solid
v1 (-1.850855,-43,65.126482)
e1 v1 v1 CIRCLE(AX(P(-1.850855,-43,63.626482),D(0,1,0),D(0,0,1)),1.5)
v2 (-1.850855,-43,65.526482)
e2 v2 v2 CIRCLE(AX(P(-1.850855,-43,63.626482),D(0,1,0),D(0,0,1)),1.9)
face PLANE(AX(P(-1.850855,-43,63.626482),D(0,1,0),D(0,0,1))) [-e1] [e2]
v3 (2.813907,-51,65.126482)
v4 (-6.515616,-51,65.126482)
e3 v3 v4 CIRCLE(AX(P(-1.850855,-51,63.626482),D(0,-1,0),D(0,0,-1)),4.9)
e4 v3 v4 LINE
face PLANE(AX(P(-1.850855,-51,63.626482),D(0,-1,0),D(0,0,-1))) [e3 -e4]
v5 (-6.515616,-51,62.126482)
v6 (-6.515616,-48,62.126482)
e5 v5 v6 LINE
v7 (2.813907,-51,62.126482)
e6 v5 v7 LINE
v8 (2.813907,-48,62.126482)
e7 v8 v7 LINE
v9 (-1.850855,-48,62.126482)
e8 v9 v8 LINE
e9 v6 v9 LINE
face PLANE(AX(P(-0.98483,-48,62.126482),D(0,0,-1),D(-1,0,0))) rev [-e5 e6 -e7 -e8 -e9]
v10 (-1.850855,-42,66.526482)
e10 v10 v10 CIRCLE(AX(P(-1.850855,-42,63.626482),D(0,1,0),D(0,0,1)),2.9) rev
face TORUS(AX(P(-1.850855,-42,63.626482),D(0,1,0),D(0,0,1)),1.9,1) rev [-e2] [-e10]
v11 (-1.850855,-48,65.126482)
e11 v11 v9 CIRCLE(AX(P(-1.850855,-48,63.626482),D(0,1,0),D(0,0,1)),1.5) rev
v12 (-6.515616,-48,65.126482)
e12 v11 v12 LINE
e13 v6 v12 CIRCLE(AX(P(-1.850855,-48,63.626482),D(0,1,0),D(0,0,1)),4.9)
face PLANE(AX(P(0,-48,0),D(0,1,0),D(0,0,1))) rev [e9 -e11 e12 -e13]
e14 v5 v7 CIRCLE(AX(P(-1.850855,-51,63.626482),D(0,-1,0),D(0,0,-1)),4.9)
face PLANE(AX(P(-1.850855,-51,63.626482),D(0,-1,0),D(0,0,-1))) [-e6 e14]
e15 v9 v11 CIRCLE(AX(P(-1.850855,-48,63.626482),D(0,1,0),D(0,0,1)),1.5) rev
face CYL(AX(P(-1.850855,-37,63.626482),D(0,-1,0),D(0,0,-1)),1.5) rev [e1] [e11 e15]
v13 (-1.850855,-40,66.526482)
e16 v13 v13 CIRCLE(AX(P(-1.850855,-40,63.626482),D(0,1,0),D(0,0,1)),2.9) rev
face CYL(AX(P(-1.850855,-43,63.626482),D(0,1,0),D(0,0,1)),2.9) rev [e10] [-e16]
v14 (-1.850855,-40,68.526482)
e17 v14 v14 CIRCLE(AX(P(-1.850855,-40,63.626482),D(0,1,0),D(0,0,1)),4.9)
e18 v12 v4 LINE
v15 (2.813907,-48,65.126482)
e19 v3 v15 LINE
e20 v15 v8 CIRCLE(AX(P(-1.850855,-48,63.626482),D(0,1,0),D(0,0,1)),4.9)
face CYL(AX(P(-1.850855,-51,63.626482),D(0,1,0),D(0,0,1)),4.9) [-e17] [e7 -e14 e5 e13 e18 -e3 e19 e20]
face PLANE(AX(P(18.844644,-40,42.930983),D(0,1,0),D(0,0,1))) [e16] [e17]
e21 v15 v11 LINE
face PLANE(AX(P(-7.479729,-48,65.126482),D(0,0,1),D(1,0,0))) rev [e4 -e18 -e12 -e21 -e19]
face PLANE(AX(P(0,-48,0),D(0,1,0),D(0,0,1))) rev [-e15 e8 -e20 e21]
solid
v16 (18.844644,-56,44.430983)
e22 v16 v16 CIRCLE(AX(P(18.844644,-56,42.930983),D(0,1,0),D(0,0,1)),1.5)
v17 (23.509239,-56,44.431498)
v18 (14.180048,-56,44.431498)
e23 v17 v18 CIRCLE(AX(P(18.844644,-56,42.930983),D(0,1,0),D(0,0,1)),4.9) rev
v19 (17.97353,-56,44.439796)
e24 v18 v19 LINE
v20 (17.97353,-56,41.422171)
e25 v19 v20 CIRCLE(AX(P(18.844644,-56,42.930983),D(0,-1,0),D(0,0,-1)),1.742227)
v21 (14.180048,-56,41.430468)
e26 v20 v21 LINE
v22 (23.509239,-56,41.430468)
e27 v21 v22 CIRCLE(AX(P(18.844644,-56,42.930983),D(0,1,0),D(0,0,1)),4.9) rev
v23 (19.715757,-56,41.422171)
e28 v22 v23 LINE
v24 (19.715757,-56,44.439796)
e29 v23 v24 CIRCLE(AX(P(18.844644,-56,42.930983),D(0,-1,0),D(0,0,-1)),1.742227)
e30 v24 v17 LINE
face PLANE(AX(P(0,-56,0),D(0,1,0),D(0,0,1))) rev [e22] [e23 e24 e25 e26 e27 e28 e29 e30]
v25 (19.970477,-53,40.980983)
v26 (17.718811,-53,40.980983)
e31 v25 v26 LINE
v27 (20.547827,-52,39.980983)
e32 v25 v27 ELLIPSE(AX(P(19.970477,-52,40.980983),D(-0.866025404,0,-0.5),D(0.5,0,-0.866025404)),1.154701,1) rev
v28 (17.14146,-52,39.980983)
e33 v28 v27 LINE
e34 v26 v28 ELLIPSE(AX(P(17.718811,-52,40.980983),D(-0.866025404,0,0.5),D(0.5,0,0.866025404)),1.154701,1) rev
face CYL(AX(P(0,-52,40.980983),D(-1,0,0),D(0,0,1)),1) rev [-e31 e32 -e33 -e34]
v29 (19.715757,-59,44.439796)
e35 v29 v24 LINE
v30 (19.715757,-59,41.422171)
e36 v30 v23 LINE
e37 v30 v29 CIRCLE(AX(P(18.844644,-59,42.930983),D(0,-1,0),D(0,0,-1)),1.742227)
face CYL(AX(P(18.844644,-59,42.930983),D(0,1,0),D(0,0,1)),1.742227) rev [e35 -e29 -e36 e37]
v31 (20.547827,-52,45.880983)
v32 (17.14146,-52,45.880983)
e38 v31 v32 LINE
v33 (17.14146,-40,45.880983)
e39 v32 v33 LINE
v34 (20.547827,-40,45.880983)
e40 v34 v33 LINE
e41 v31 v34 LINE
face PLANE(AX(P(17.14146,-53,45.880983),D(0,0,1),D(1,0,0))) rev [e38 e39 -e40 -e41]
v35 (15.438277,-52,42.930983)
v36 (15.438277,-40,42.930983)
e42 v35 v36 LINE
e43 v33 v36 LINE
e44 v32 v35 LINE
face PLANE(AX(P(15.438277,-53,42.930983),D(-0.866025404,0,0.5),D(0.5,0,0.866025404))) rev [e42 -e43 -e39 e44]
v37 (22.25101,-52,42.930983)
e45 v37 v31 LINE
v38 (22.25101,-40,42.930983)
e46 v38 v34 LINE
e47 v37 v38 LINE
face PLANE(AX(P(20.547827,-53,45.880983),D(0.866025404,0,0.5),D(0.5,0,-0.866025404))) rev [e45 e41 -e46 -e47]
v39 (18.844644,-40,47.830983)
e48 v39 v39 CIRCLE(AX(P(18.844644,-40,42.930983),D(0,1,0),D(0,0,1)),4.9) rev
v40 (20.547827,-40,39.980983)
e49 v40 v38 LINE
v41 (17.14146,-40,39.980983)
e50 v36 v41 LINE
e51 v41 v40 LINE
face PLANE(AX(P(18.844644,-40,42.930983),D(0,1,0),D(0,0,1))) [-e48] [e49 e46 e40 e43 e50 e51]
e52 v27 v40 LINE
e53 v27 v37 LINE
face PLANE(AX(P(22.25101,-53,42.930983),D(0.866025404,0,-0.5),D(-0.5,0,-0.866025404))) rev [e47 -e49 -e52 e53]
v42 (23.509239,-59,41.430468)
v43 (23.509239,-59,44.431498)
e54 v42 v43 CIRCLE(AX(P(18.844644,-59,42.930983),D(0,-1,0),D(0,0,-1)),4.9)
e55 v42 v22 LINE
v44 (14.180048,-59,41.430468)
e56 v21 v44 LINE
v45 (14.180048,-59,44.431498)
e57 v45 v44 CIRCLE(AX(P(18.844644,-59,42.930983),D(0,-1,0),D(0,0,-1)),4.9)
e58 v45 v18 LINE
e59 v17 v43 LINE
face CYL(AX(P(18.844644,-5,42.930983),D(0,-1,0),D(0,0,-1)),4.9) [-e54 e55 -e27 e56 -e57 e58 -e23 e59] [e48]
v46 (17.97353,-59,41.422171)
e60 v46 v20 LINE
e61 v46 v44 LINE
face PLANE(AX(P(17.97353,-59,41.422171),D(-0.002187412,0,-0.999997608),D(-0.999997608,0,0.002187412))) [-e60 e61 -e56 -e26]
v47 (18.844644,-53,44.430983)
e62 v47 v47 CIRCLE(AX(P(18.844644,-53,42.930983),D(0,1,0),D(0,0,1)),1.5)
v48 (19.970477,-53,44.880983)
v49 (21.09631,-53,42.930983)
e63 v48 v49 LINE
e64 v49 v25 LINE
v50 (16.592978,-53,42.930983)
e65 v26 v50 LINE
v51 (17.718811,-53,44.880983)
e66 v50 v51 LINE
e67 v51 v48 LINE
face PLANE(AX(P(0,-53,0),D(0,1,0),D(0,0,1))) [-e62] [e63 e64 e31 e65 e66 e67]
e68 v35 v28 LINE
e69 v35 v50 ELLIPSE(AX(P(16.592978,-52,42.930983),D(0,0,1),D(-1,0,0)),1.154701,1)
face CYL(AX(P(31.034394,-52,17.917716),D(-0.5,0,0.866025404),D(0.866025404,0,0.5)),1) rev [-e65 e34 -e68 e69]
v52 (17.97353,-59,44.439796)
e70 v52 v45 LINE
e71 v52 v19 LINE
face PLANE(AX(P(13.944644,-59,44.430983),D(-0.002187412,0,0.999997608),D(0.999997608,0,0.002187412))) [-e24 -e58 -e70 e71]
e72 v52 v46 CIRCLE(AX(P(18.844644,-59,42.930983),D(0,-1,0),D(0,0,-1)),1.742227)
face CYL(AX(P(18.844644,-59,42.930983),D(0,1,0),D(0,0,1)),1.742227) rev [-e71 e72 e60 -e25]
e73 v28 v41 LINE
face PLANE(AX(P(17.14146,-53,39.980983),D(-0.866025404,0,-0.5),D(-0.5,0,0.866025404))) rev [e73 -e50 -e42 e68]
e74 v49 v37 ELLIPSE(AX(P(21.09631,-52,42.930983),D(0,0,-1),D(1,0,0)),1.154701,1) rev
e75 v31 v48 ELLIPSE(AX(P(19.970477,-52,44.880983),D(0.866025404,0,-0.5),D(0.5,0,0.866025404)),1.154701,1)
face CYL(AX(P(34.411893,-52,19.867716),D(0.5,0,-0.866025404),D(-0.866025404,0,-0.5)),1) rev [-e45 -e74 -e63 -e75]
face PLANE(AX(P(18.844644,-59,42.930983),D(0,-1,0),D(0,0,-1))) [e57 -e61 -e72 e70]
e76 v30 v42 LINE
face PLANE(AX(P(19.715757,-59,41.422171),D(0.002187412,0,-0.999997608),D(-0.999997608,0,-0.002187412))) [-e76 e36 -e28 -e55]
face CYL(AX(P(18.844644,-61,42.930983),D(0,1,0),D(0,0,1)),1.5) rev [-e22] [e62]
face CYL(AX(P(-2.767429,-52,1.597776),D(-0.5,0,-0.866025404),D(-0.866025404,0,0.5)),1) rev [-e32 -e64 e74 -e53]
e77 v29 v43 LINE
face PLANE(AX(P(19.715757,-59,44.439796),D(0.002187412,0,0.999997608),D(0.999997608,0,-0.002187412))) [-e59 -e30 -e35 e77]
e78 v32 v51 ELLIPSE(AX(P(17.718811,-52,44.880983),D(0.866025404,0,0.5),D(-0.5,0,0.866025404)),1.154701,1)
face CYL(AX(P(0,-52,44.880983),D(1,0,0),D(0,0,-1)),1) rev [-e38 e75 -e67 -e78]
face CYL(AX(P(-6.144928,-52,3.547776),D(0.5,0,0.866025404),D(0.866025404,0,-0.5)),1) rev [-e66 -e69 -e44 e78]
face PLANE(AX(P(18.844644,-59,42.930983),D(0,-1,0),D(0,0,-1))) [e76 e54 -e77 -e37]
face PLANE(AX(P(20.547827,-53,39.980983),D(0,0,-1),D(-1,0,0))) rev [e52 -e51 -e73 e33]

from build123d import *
from build123d.topology import SkipClean

# Parameters (mm, degrees)
EXTRUDE_1_DEPTH          = 3
SKETCH_2_R               = 5.35
EXTRUDE_2_DEPTH          = 23
CUT_EXTRUDE_1_DEPTH      = 3
SKETCH_4_R               = 5
EXTRUDE_3_DEPTH          = 100
EXTRUDE_START            = 3
SKETCH_5_R               = 5
EXTRUDE_4_DEPTH          = 3
SKETCH_6_R               = 5.35
EXTRUDE_5_DEPTH          = 5
SKETCH_7_R               = 5.35
EXTRUDE_6_DEPTH          = 5
SKETCH_8_W               = 75
SKETCH_8_H               = 10.7
EXTRUDE_7_DEPTH          = 3
EXTRUDE_8_DEPTH          = 3
CUT_EXTRUDE_2_DEPTH      = 3
SKETCH_12_R              = 6
EXTRUDE_10_DEPTH         = 13
SKETCH_13_R              = 3
CUT_EXTRUDE_3_DEPTH      = 23
SKETCH_14_R              = 3.125
CUT_EXTRUDE_5_DEPTH      = 100
SKETCH_15_R              = 6
SKETCH_15_R_2            = 5.35
EXTRUDE_11_DEPTH         = 5
SKETCH_16_R              = 6
SKETCH_16_R_2            = 3
EXTRUDE_12_DEPTH         = 5
SKETCH_17_R              = 5.35
SKETCH_17_R_2            = 3
EXTRUDE_13_DEPTH         = 5
SKETCH_18_R              = 5.35
SKETCH_18_R_2            = 3
EXTRUDE_14_DEPTH         = 5
SKETCH_20_R              = 6
SKETCH_20_R_2            = 5.35
EXTRUDE_15_DEPTH         = 5
SKETCH_21_R              = 6
SKETCH_21_R_2            = 5.35
EXTRUDE_16_DEPTH         = 5
SKETCH_22_R              = 5.35
SKETCH_22_R_2            = 3
EXTRUDE_17_DEPTH         = 5
SKETCH_23_R              = 5.35
SKETCH_23_R_2            = 3
EXTRUDE_18_DEPTH         = 5
SKETCH_25_R              = 7.5
EXTRUDE_20_DEPTH         = 3
EXTRUDE_21_DEPTH         = 3
EXTRUDE_23_DEPTH         = 3
SKETCH_30_R              = 7.5
EXTRUDE_24_DEPTH         = 3
FILLET_1_R               = 3
EXTRUDE_29_DEPTH         = 5
EXTRUDE_31_DEPTH         = 2
SKETCH_50_R              = 5.998205811
EXTRUDE_32_DEPTH         = 103
CUT_EXTRUDE_START        = -95
SKETCH_52_R              = 5.998205811
SKETCH_52_R_2            = 4.9
CUT_EXTRUDE_7_DEPTH      = 95
CUT_EXTRUDE_START_2      = -44
SKETCH_53_R              = 4.9
CUT_EXTRUDE_8_DEPTH      = 44
SKETCH_54_R              = 1.5
EXTRUDE_33_DEPTH         = 5
CUT_EXTRUDE_9_DEPTH      = 56
CUT_EXTRUDE_START_3      = -6
SKETCH_56_R              = 1.5
CUT_EXTRUDE_10_DEPTH     = 6
SKETCH_57_R              = 15
EXTRUDE_34_DEPTH         = 3
SKETCH_58_R              = 4.9
EXTRUDE_35_DEPTH         = 51
CUT_EXTRUDE_11_DEPTH     = 5
SKETCH_60_R              = 2.75
CUT_EXTRUDE_12_DEPTH     = 46
SKETCH_61_R              = 1.5
CUT_EXTRUDE_13_DEPTH     = 9
CUT_EXTRUDE_14_DEPTH     = 1.65
SKETCH_63_R              = 1
CUT_EXTRUDE_15_DEPTH     = 1.5
PATTERN_CIRCULAR_1_COUNT = 8
SKETCH_64_R              = 3.175426481
CUT_EXTRUDE_17_DEPTH     = 5
CUT_EXTRUDE_18_DEPTH     = 56
FILLET_2_R               = 1
EXTRUDE_36_DEPTH         = 5
SKETCH_67_R              = 1.5
CUT_EXTRUDE_19_DEPTH     = 5
FILLET_3_R               = 1
SKETCH_69_R              = 4.9
EXTRUDE_37_DEPTH         = 3
CUT_EXTRUDE_20_DEPTH     = 3
CUT_EXTRUDE_21_DEPTH     = 3
SKETCH_71_R              = 2.9
CUT_EXTRUDE_22_DEPTH     = 46
FILLET_4_R               = 1
SKETCH_72_R              = 1.742227019
CUT_EXTRUDE_23_DEPTH     = 3
SKETCH_73_R              = 80.568132645
CUT_EXTRUDE_24_DEPTH     = 40
SKETCH_74_R              = 81.791796687
CUT_EXTRUDE_25_DEPTH     = 40


with BuildPart() as part:
    # 草图1 → 凸台-拉伸1 (new body)
    with BuildSketch(Plane(origin=(0, 0, 0), x_dir=(1, 0, 0), z_dir=(0, 1, 0))):
        Polygon((-18.65535641, 0), (18.84464359, -42.930983399), (56.34464359, 0), align=None)
    extrude(amount=EXTRUDE_1_DEPTH)

    # 草图2 → 凸台-拉伸2 (add)
    with BuildSketch(Plane(origin=(0, 3, 0), x_dir=(1, 0, 0), z_dir=(0, 1, 0))):
        with Locations(Location((56.34464359, 0, 0), (0, 0, 270))):
            Circle(SKETCH_2_R)
        with Locations(Location((-18.65535641, 0, 0), (0, 0, 270))):
            Circle(SKETCH_2_R)
    extrude(amount=-EXTRUDE_2_DEPTH)

    # 草图3 → 切除-拉伸1 (cut)
    with BuildSketch(Plane.XZ):
        Polygon((8.632668758, 17.559374543), (1.15609776, 9), (33.75905687, 9), (36.53318942, 9), (29.056618422, 17.559374543), (18.84464359, 29.25031113), align=None)
    extrude(amount=-CUT_EXTRUDE_1_DEPTH, mode=Mode.SUBTRACT)

    # 草图4 → 凸台-拉伸3 (add)
    with BuildSketch(Plane.XZ):
        with Locations(Location((18.84464359, 42.930983399, 0), (0, 0, 228.862949093))):
            Circle(SKETCH_4_R)
    extrude(amount=EXTRUDE_3_DEPTH)

    # 草图5 → 凸台-拉伸4 (add)
    with BuildSketch(Plane(origin=(0, 0, 0), x_dir=(1, 0, 0), z_dir=(0, 1, 0)).offset(EXTRUDE_START)):
        with Locations(Location((18.84464359, -42.930983399, 0), (0, 0, 131.137050907))):
            Circle(SKETCH_5_R)
    extrude(amount=-EXTRUDE_4_DEPTH)

    # 草图6 → 凸台-拉伸5 (add)
    with SkipClean():  # the faces are left unmerged after this step: merging them gives an invalid solid
        with BuildSketch(Plane.XZ.offset(20)):
            with Locations(Location((56.34464359, 0, 0), (0, 0, 131.137050907))):
                Circle(SKETCH_6_R)
        extrude(amount=EXTRUDE_5_DEPTH)
    add(part.part.scale(1), mode=Mode.REPLACE)  # the faces are merged on a copy

    # 草图7 → 凸台-拉伸6 (add)
    with BuildSketch(Plane.XZ.offset(20)):
        with Locations(Location((-18.65535641, 0, 0), (0, 0, 48.862949093))):
            Circle(SKETCH_7_R)
    extrude(amount=EXTRUDE_6_DEPTH)

    # 草图8 → 凸台-拉伸7 (add)
    with SkipClean():  # the faces are left unmerged after this step: merging them gives an invalid solid
        with BuildSketch(Plane(origin=(0, 3, 0), x_dir=(1, 0, 0), z_dir=(0, 1, 0))):
            with Locations((18.84464359, 0)):
                Rectangle(SKETCH_8_W, SKETCH_8_H)
        extrude(amount=-EXTRUDE_7_DEPTH)

    # 草图9 → 凸台-拉伸8 (add)
    with SkipClean():  # the faces are left unmerged after this step: merging them gives an invalid solid
        with BuildSketch(Plane(origin=(0, 3, 0), x_dir=(1, 0, 0), z_dir=(0, 1, 0))):
            Polygon((61.69464359, 0), (18.84464359, -47.930983399), (-24.00535641, 0), align=None)
        extrude(amount=-EXTRUDE_8_DEPTH)

    # 草图10 → 切除-拉伸2 (cut)
    with SkipClean():  # the faces are left unmerged after this step: merging them gives an invalid solid
        with BuildSketch(Plane.XZ):
            Polygon((18.84464359, 37.930983399), (-13.313716495, 0.298969924), (50.99464359, 0), align=None)
        extrude(amount=-CUT_EXTRUDE_2_DEPTH, mode=Mode.SUBTRACT)

    # 草图12 → 凸台-拉伸10 (add)
    with SkipClean():  # the faces are left unmerged after this step: merging them gives an invalid solid
        with BuildSketch(Plane(origin=(0, 3, 0), x_dir=(1, 0, 0), z_dir=(0, 1, 0))):
            with Locations(Location((-18.65535641, 0, 0), (0, 0, 270))):
                Circle(SKETCH_12_R)
            with Locations(Location((56.34464359, 0, 0), (0, 0, 270))):
                Circle(SKETCH_12_R)
        extrude(amount=-EXTRUDE_10_DEPTH)

    # 草图13 → 切除-拉伸3 (cut)
    with SkipClean():  # the faces are left unmerged after this step: merging them gives an invalid solid
        with BuildSketch(Plane.XZ.offset(25)):
            with Locations(Location((-18.65535641, 0, 0), (0, 0, 270))):
                Circle(SKETCH_13_R)
            with Locations(Location((56.34464359, 0, 0), (0, 0, 270))):
                Circle(SKETCH_13_R)
        extrude(amount=-CUT_EXTRUDE_3_DEPTH, mode=Mode.SUBTRACT)

    # 草图14 → 切除-拉伸5 (cut)
    with SkipClean():  # the faces are left unmerged after this step: merging them gives an invalid solid
        with BuildSketch(Plane.XZ.offset(100)):
            with Locations(Location((18.84464359, 42.930983399, 0), (0, 0, 270))):
                Circle(SKETCH_14_R)
        extrude(amount=-CUT_EXTRUDE_5_DEPTH, mode=Mode.SUBTRACT)

    # 草图15 → 凸台-拉伸11 (add)
    with SkipClean():  # the faces are left unmerged after this step: merging them gives an invalid solid
        with BuildSketch(Plane.XZ.offset(10)):
            with Locations(Location((56.34464359, 0, 0), (0, 0, 90.133194259))):
                Circle(SKETCH_15_R)
            with Locations(Location((56.34464359, 0, 0), (0, 0, 270))):
                Circle(SKETCH_15_R_2, mode=Mode.SUBTRACT)
        extrude(amount=EXTRUDE_11_DEPTH)

    # 草图16 → 凸台-拉伸12 (add)
    with SkipClean():  # the faces are left unmerged after this step: merging them gives an invalid solid
        with BuildSketch(Plane.XZ.offset(10)):
            with Locations(Location((-18.65535641, 0, 0), (0, 0, 89.866805741))):
                Circle(SKETCH_16_R)
            with Locations(Location((-18.65535641, 0, 0), (0, 0, 270))):
                Circle(SKETCH_16_R_2, mode=Mode.SUBTRACT)
        extrude(amount=EXTRUDE_12_DEPTH)

    # 草图17 → 凸台-拉伸13 (add)
    with SkipClean():  # the faces are left unmerged after this step: merging them gives an invalid solid
        with BuildSketch(Plane.XZ.offset(25)):
            with Locations(Location((-18.65535641, 0, 0), (0, 0, 270))):
                Circle(SKETCH_17_R)
            with Locations(Location((-18.65535641, 0, 0), (0, 0, 270))):
                Circle(SKETCH_17_R_2, mode=Mode.SUBTRACT)
        extrude(amount=EXTRUDE_13_DEPTH)

    # 草图18 → 凸台-拉伸14 (add)
    with SkipClean():  # the faces are left unmerged after this step: merging them gives an invalid solid
        with BuildSketch(Plane.XZ.offset(25)):
            with Locations(Location((56.34464359, 0, 0), (0, 0, 270))):
                Circle(SKETCH_18_R)
            with Locations(Location((56.34464359, 0, 0), (0, 0, 270))):
                Circle(SKETCH_18_R_2, mode=Mode.SUBTRACT)
        extrude(amount=EXTRUDE_14_DEPTH)

    # 草图20 → 凸台-拉伸15 (add)
    with SkipClean():  # the faces are left unmerged after this step: merging them gives an invalid solid
        with BuildSketch(Plane.XZ.offset(15)):
            with Locations(Location((-18.65535641, 0, 0), (0, 0, 89.866805741))):
                Circle(SKETCH_20_R)
            with Locations(Location((-18.65535641, 0, 0), (0, 0, 270))):
                Circle(SKETCH_20_R_2, mode=Mode.SUBTRACT)
        extrude(amount=EXTRUDE_15_DEPTH)

    # 草图21 → 凸台-拉伸16 (add)
    with SkipClean():  # the faces are left unmerged after this step: merging them gives an invalid solid
        with BuildSketch(Plane.XZ.offset(15)):
            with Locations(Location((56.34464359, 0, 0), (0, 0, 90.133194259))):
                Circle(SKETCH_21_R)
            with Locations(Location((56.34464359, 0, 0), (0, 0, 270))):
                Circle(SKETCH_21_R_2, mode=Mode.SUBTRACT)
        extrude(amount=EXTRUDE_16_DEPTH)

    # 草图22 → 凸台-拉伸17 (add)
    with SkipClean():  # the faces are left unmerged after this step: merging them gives an invalid solid
        with BuildSketch(Plane.XZ.offset(30)):
            with Locations(Location((-18.65535641, 0, 0), (0, 0, 270))):
                Circle(SKETCH_22_R)
            with Locations(Location((-18.65535641, 0, 0), (0, 0, 270))):
                Circle(SKETCH_22_R_2, mode=Mode.SUBTRACT)
        extrude(amount=EXTRUDE_17_DEPTH)

    # 草图23 → 凸台-拉伸18 (add)
    with SkipClean():  # the faces are left unmerged after this step: merging them gives an invalid solid
        with BuildSketch(Plane.XZ.offset(30)):
            with Locations(Location((56.34464359, 0, 0), (0, 0, 270))):
                Circle(SKETCH_23_R)
            with Locations(Location((56.34464359, 0, 0), (0, 0, 270))):
                Circle(SKETCH_23_R_2, mode=Mode.SUBTRACT)
        extrude(amount=EXTRUDE_18_DEPTH)

    # 草图25 → 凸台-拉伸20 (add)
    with SkipClean():  # the faces are left unmerged after this step: merging them gives an invalid solid
        with BuildSketch(Plane(origin=(0, 3, 0), x_dir=(1, 0, 0), z_dir=(0, 1, 0))):
            with Locations((18.84464359, -42.930983399)):
                Circle(SKETCH_25_R)
        extrude(amount=-EXTRUDE_20_DEPTH)

    # 草图28 → 凸台-拉伸21 (add)
    with SkipClean():  # the faces are left unmerged after this step: merging them gives an invalid solid
        with BuildSketch(Plane(origin=(0, 3, 0), x_dir=(1, 0, 0), z_dir=(0, 1, 0))):
            Polygon((-3.379636645, -23.071435978), (2.093554995, -18.328702995), (68.652557408, -96.216669577), (66.868599364, -97.910067347), (64.321605904, -100.026810209), align=None)
        extrude(amount=-EXTRUDE_21_DEPTH)

    # 草图29 → 凸台-拉伸23 (add)
    with SkipClean():  # the faces are left unmerged after this step: merging them gives an invalid solid
        with BuildSketch(Plane(origin=(0, 3, 0), x_dir=(1, 0, 0), z_dir=(0, 1, 0))):
            Polygon((56.34464359, 0), (53.74105837, -88), (59.74105837, -88), (62.34464359, 0), align=None)
        extrude(amount=-EXTRUDE_23_DEPTH)

    # 草图30 → 凸台-拉伸24 (add)
    with SkipClean():  # the faces are left unmerged after this step: merging them gives an invalid solid
        with BuildSketch(Plane(origin=(0, 3, 0), x_dir=(1, 0, 0), z_dir=(0, 1, 0))):
            with Locations((62.6531538, -93.694621783)):
                Circle(SKETCH_30_R)
        extrude(amount=-EXTRUDE_24_DEPTH)

    # 圆角1
    # the kernel refuses this fillet: 3 mm, written as the material it adds along each edge
    with BuildSketch(Plane(origin=(60.387632696, 0, 86.544977448), x_dir=(-0.6496534253779116, 0, -0.760230509052844), z_dir=(0, 1, 0))) as fillet_1_piece_1:
        with BuildLine():
            CenterArc((1.763131122, -3), FILLET_1_R, 90, 55.663998218)
            ThreePointArc((-0.714100998, -1.307864951), (-0.324488751, -0.671711358), (0, 0))
            Line((0, 0), (1.763131122, 0))
        make_face()
    extrude(amount=3)
    with BuildSketch(Plane(origin=(59.804303017, 0, 85.862359607), x_dir=(0.02957325513951661, 0, -0.9995626156376863), z_dir=(0, 1, 0))) as fillet_1_piece_2:
        with BuildLine():
            CenterArc((FILLET_1_R * 0.38596961824, -FILLET_1_R), FILLET_1_R, 90, 42.210146514)
            Line((-FILLET_1_R * 0.285882149698, -FILLET_1_R * 0.259314370385), (0, 0))
            Line((0, 0), (FILLET_1_R * 0.38596961824, 0))
        make_face()
    extrude(amount=3)

    # 草图31 → 凸台-拉伸29 (add)
    with BuildSketch(Plane.XZ):
        Polygon((-14.723586471, -1.628179316), (-14.723586471, -3.628179316), (53.527409972, -3.628179316), (53.82491501, -1.628179316), align=None)
        Polygon((49.609847968, 80.102545011), (51.130308987, 78.80323816), (22.318773999, 45.087710689), (20.798312981, 46.38701754), align=None)
        Polygon((-15.349607435, 4.086383285), (-13.829146417, 2.787076434), (17.097273349, 38.977461836), (15.576812331, 40.276768687), align=None)
        Polygon((20.325894576, 39.186783249), (51.86894969, 1.971881231), (53.394639731, 3.265043982), (21.851584617, 40.479945999), align=None)
        Polygon((56.093860655, 78.864293565), (58.318881117, 3.659610745), (60.319756269, 3.659610745), (58.092985887, 78.923440075), align=None)
    extrude(amount=EXTRUDE_29_DEPTH)

    # 切除-扫描1: sweep along a path in 草图36
    with BuildLine(Plane.XZ.offset(5)) as sweep_1_path:
        Line((18.84464359, -3.628179316), (18.84464359, -1.628179316))
    # 草图35 → 切除-扫描1 (sweep, cut)
    with BuildSketch(Plane(origin=(0, 0, -3.628179316), x_dir=(-1, 0, 0), z_dir=(0, 0, -1))):
        Polygon((13.876620714, -5), (9.876620714, -2), (-47.565907894, -2), (-51.565907894, -5), align=None)
    sweep(path=sweep_1_path.line, mode=Mode.SUBTRACT)

    # 切除-扫描3: sweep along a path in 草图38
    with BuildLine(Plane.XZ.offset(5)) as sweep_3_path:
        Line((59.19369399, 41.720005215), (57.192818839, 41.720005215))
    # 草图37 → 切除-扫描3 (sweep, cut)
    with BuildSketch(Plane(origin=(60.375181238, 0, 1.786271926), x_dir=(0.029573255139513054, 0, -0.9995626156376864), z_dir=(0.9995626156376866, 0, 0.029573255139513057))):
        Polygon((-2.73149314, -5), (-6.73149314, -1), (-73.170921503, -1), (-77.170921503, -5), align=None)
    sweep(path=sweep_3_path.line, mode=Mode.SUBTRACT)

    # 草图39 → 凸台-拉伸31 (add)
    with BuildSketch(Plane(origin=(58.376056006, 0, 1.727125416), x_dir=(0.02957325513951297, 0, -0.9995626156376864), z_dir=(0.9995626156376866, 0, 0.029573255139512974))):
        Polygon((-3.961044, -3.829621531), (-3.961044, -5), (-2.73149314, -5), (-2.73149314, -4.501704435), (-3.961044, -3.272153575), align=None)
    extrude(amount=EXTRUDE_31_DEPTH)

    # 切除-扫描5: sweep along a path in 草图42
    with BuildLine(Plane.XZ.offset(5)) as sweep_5_path:
        Line((0.095091388, 22.159914171), (1.552120507, 20.786378718))
    # 草图40 → 切除-扫描5 (sweep, cut)
    with BuildSketch(Plane(origin=(-10.889521113, 0, 9.305617977), x_dir=(0.6496534253779145, 0, 0.7602305090528415), z_dir=(-0.7602305090528415, 0, 0.6496534253779145))):
        Polygon((-5.121187346, -5), (-3.121187346, -1), (36.9380259, -1), (38.9380259, -5), align=None)
    sweep(path=sweep_5_path.line, mode=Mode.SUBTRACT)

    # 切除-扫描6: sweep along a path in 草图44
    with BuildLine(Plane.XZ.offset(5)) as sweep_6_path:
        Line((36.035656698, 20.652203895), (37.472857905, 22.049766909))
    # 草图43 → 切除-扫描6 (sweep, cut)
    with BuildSketch(Plane(origin=(31.1568423, 0, 26.408291855), x_dir=(-0.6465813751887421, 0, 0.7628450204720715), z_dir=(-0.7628450204720715, 0, -0.6465813751887421))):
        Polygon((14.734624595, -5), (12.734624595, -1), (-27.825731715, -1), (-29.825731715, -5), align=None)
    sweep(path=sweep_6_path.line, mode=Mode.SUBTRACT)

    # 切除-扫描7: sweep along a path in 草图47
    with BuildLine(Plane.XZ.offset(5)) as sweep_7_path:
        Line((37.03221924, 62.305521799), (35.511758222, 63.60482865))
    # 草图46 → 切除-扫描7 (sweep, cut)
    with BuildSketch(Plane(origin=(-10.889521113, 0, 9.305617977), x_dir=(0.6496534253779142, 0, 0.7602305090528417), z_dir=(-0.7602305090528417, 0, 0.6496534253779142))):
        Polygon((50.821835343, -5), (52.821835343, -1), (88.125606235, -1), (93.125606235, 0), (93.125606235, -5), align=None)
    sweep(path=sweep_7_path.line, mode=Mode.SUBTRACT)

    # 切除-扫描8: sweep along a path in 草图49
    with BuildLine(Plane.XZ.offset(1)) as sweep_8_path:
        Line((58.211278907, 74.925189613), (56.210403756, 74.925189613))
        Line((56.210403756, 74.925189613), (55.379994456, 74.925189613))
    # 草图48 → 切除-扫描8 (sweep, cut)
    with BuildSketch(Plane(origin=(60.375181238, 0, 1.786271926), x_dir=(0.029573255139513054, 0, -0.9995626156376864), z_dir=(0.9995626156376866, 0, 0.029573255139513057))):
        Polygon((-73.170921503, -1), (-77.170921503, 0), (-77.170921503, -5), align=None)
    sweep(path=sweep_8_path.line, mode=Mode.SUBTRACT)

    # 草图50 → 凸台-拉伸32 (add)
    with BuildSketch(Plane(origin=(0, 3, 0), x_dir=(1, 0, 0), z_dir=(0, 1, 0))):
        with Locations(Location((18.84464359, -42.930983399, 0), (0, 0, 270))):
            Circle(SKETCH_50_R)
    extrude(amount=-EXTRUDE_32_DEPTH)

    # 草图52 → 切除-拉伸7 (cut)
    with BuildSketch(Plane.XZ.offset(100).offset(CUT_EXTRUDE_START)):
        with Locations((18.84464359, 42.930983399)):
            Circle(SKETCH_52_R)
        with Locations(Location((18.84464359, 42.930983399, 0), (0, 0, 270))):
            Circle(SKETCH_52_R_2, mode=Mode.SUBTRACT)
    extrude(amount=CUT_EXTRUDE_7_DEPTH, mode=Mode.SUBTRACT)

    # 草图53 → 切除-拉伸8 (cut)
    with BuildSketch(Plane.XZ.offset(100).offset(CUT_EXTRUDE_START_2)):
        with Locations(Location((18.84464359, 42.930983399, 0), (0, 0, 270))):
            Circle(SKETCH_53_R)
    extrude(amount=CUT_EXTRUDE_8_DEPTH, mode=Mode.SUBTRACT)

    # 草图54 → 凸台-拉伸33 (add)
    with BuildSketch(Plane.XZ.offset(56)):
        Polygon((22.020070071, 42.930983399), (20.43235683, 45.680983399), (17.25693035, 45.680983399), (15.669217109, 42.930983399), (17.25693035, 40.180983399), (20.43235683, 40.180983399), align=None)
        with Locations(Location((18.84464359, 42.930983399, 0), (0, 0, 270))):
            Circle(SKETCH_54_R, mode=Mode.SUBTRACT)
    extrude(amount=EXTRUDE_33_DEPTH)

    # 草图55 → 切除-拉伸9 (cut)
    with BuildSketch(Plane(origin=(0, 3, 0), x_dir=(1, 0, 0), z_dir=(0, 1, 0))):
        Polygon((22.077805097, -42.930983399), (20.461224344, -40.130983399), (17.228062836, -40.130983399), (15.611482083, -42.930983399), (17.228062836, -45.730983399), (20.461224344, -45.730983399), align=None)
    extrude(amount=-CUT_EXTRUDE_9_DEPTH, mode=Mode.SUBTRACT)

    # 草图56 → 切除-拉伸10 (cut)
    with BuildSketch(Plane.XZ.offset(56).offset(CUT_EXTRUDE_START_3)):
        with Locations(Location((18.84464359, 42.930983399, 0), (0, 0, 90))):
            Circle(SKETCH_56_R)
    extrude(amount=CUT_EXTRUDE_10_DEPTH, mode=Mode.SUBTRACT)

    # 草图64 → 切除-拉伸17 (cut)
    with BuildSketch(Plane.XZ.offset(61)):
        with Locations((18.84464359, 42.930983399)):
            Circle(SKETCH_64_R)
    extrude(amount=-CUT_EXTRUDE_17_DEPTH, mode=Mode.SUBTRACT)

    # 草图65 → 切除-拉伸18 (cut)
    with BuildSketch(Plane(origin=(0, 3, 0), x_dir=(1, 0, 0), z_dir=(0, 1, 0))):
        Polygon((22.251010178, -42.930983399), (20.547826884, -39.980983399), (17.141460296, -39.980983399), (15.438277002, -42.930983399), (17.141460296, -45.880983399), (20.547826884, -45.880983399), align=None)
    extrude(amount=-CUT_EXTRUDE_18_DEPTH, mode=Mode.SUBTRACT)

    # 圆角2
    # the kernel refuses this fillet: 1 mm, written as the material it adds along each edge
    with BuildSketch(Plane(origin=(19.297826884, -53, 48.046046908), x_dir=(0, 1, 0), z_dir=(0.49999999999999994, 0, -0.8660254037844387))) as fillet_2_piece_1_section:
        with BuildLine():
            CenterArc((FILLET_2_R, -FILLET_2_R), FILLET_2_R, 90, 90)
            Line((0, -FILLET_2_R), (0, 0))
            Line((0, 0), (FILLET_2_R, 0))
        make_face()
    fillet_2_piece_1 = extrude(amount=8.406366588, mode=Mode.PRIVATE)
    fillet_2_piece_1 = split(fillet_2_piece_1, bisect_by=Plane(origin=(21.196381273, -52.783149841, 45.880983399), z_dir=(0, 0, -1)), keep=Keep.TOP, mode=Mode.PRIVATE)
    fillet_2_piece_1 = split(fillet_2_piece_1, bisect_by=Plane(origin=(22.575287373, -52.783149841, 43.492647975), z_dir=(-0.8660254037844382, 0, 0.5000000000000009)), keep=Keep.TOP, mode=Mode.PRIVATE)
    add(fillet_2_piece_1)
    with BuildSketch(Plane(origin=(14.641460296, -53, 45.880983399), x_dir=(0, 1, 0), z_dir=(1, 0, 0))) as fillet_2_piece_2_section:
        with BuildLine():
            CenterArc((FILLET_2_R, -FILLET_2_R), FILLET_2_R, 90, 90)
            Line((0, -FILLET_2_R), (0, 0))
            Line((0, 0), (FILLET_2_R, 0))
        make_face()
    fillet_2_piece_2 = extrude(amount=8.406366588, mode=Mode.PRIVATE)
    fillet_2_piece_2 = split(fillet_2_piece_2, bisect_by=Plane(origin=(20.22354969, -52.783149841, 46.442647975), z_dir=(-0.8660254037844387, 0, -0.49999999999999994)), keep=Keep.TOP, mode=Mode.PRIVATE)
    fillet_2_piece_2 = split(fillet_2_piece_2, bisect_by=Plane(origin=(17.46573749, -52.783149841, 46.442647975), z_dir=(0.8660254037844393, 0, -0.49999999999999906)), keep=Keep.TOP, mode=Mode.PRIVATE)
    add(fillet_2_piece_2)
    with BuildSketch(Plane(origin=(14.188277002, -53, 40.765919889), x_dir=(0, 1, 0), z_dir=(0.49999999999999906, 0, 0.8660254037844393))) as fillet_2_piece_3_section:
        with BuildLine():
            CenterArc((FILLET_2_R, -FILLET_2_R), FILLET_2_R, 90, 90)
            Line((0, -FILLET_2_R), (0, 0))
            Line((0, 0), (FILLET_2_R, 0))
        make_face()
    fillet_2_piece_3 = extrude(amount=8.406366588, mode=Mode.PRIVATE)
    fillet_2_piece_3 = split(fillet_2_piece_3, bisect_by=Plane(origin=(16.492905907, -52.783149841, 45.880983399), z_dir=(0, 0, -1)), keep=Keep.TOP, mode=Mode.PRIVATE)
    fillet_2_piece_3 = split(fillet_2_piece_3, bisect_by=Plane(origin=(15.113999807, -52.783149841, 43.492647975), z_dir=(0.8660254037844386, 0, 0.5000000000000002)), keep=Keep.TOP, mode=Mode.PRIVATE)
    add(fillet_2_piece_3)
    with BuildSketch(Plane(origin=(18.391460296, -53, 37.815919889), x_dir=(0, 1, 0), z_dir=(-0.5000000000000002, 0, 0.8660254037844386))) as fillet_2_piece_4_section:
        with BuildLine():
            CenterArc((FILLET_2_R, -FILLET_2_R), FILLET_2_R, 90, 90)
            Line((0, -FILLET_2_R), (0, 0))
            Line((0, 0), (FILLET_2_R, 0))
        make_face()
    fillet_2_piece_4 = extrude(amount=8.406366588, mode=Mode.PRIVATE)
    fillet_2_piece_4 = split(fillet_2_piece_4, bisect_by=Plane(origin=(15.113999807, -52.783149841, 42.369318822), z_dir=(0.8660254037844393, 0, -0.49999999999999906)), keep=Keep.TOP, mode=Mode.PRIVATE)
    fillet_2_piece_4 = split(fillet_2_piece_4, bisect_by=Plane(origin=(16.492905907, -52.783149841, 39.980983399), z_dir=(0, 0, 1)), keep=Keep.TOP, mode=Mode.PRIVATE)
    add(fillet_2_piece_4)
    with BuildSketch(Plane(origin=(23.047826884, -53, 39.980983399), x_dir=(0, 1, 0), z_dir=(-1, 0, 0))) as fillet_2_piece_5_section:
        with BuildLine():
            CenterArc((FILLET_2_R, -FILLET_2_R), FILLET_2_R, 90, 90)
            Line((0, -FILLET_2_R), (0, 0))
            Line((0, 0), (FILLET_2_R, 0))
        make_face()
    fillet_2_piece_5 = extrude(amount=8.406366588, mode=Mode.PRIVATE)
    fillet_2_piece_5 = split(fillet_2_piece_5, bisect_by=Plane(origin=(17.46573749, -52.783149841, 39.419318822), z_dir=(0.8660254037844386, 0, 0.5000000000000002)), keep=Keep.TOP, mode=Mode.PRIVATE)
    fillet_2_piece_5 = split(fillet_2_piece_5, bisect_by=Plane(origin=(20.22354969, -52.783149841, 39.419318822), z_dir=(-0.8660254037844382, 0, 0.5000000000000009)), keep=Keep.TOP, mode=Mode.PRIVATE)
    add(fillet_2_piece_5)
    with BuildSketch(Plane(origin=(23.501010178, -53, 45.096046908), x_dir=(0, 1, 0), z_dir=(-0.5000000000000009, 0, -0.8660254037844382))) as fillet_2_piece_6_section:
        with BuildLine():
            CenterArc((FILLET_2_R, -FILLET_2_R), FILLET_2_R, 90, 90)
            Line((0, -FILLET_2_R), (0, 0))
            Line((0, 0), (FILLET_2_R, 0))
        make_face()
    fillet_2_piece_6 = extrude(amount=8.406366588, mode=Mode.PRIVATE)
    fillet_2_piece_6 = split(fillet_2_piece_6, bisect_by=Plane(origin=(22.575287373, -52.783149841, 42.369318822), z_dir=(-0.8660254037844387, 0, -0.49999999999999994)), keep=Keep.TOP, mode=Mode.PRIVATE)
    fillet_2_piece_6 = split(fillet_2_piece_6, bisect_by=Plane(origin=(21.196381273, -52.783149841, 39.980983399), z_dir=(0, 0, 1)), keep=Keep.TOP, mode=Mode.PRIVATE)
    add(fillet_2_piece_6)

    # 草图69 → 凸台-拉伸37 (add)
    with BuildSketch(Plane.XZ.offset(56)):
        with Locations(Location((18.84464359, 42.930983399, 0), (0, 0, 270))):
            Circle(SKETCH_69_R)
    extrude(amount=EXTRUDE_37_DEPTH)

    # 草图68 → 切除-拉伸20 (cut)
    with BuildSketch(Plane.XZ.offset(56)):
        Polygon((17.97353008, 41.422170541), (13.94464359, 41.430983399), (15.863729909, 37.533957775), (21.64727463, 37.627802071), (23.74464359, 41.430983399), (19.7157571, 41.422170541), (20.586870609, 42.930983399), (19.7157571, 44.439796256), (23.74464359, 44.430983399), (21.991739507, 48.037279535), (15.697547673, 48.037279535), (13.94464359, 44.430983399), (17.97353008, 44.439796256), (17.102416571, 42.930983399), align=None)
    extrude(amount=CUT_EXTRUDE_20_DEPTH, mode=Mode.SUBTRACT)

    # 草图72 → 切除-拉伸23 (cut)
    with BuildSketch(Plane.XZ.offset(56)):
        with Locations((18.84464359, 42.930983399)):
            Circle(SKETCH_72_R)
    extrude(amount=CUT_EXTRUDE_23_DEPTH, mode=Mode.SUBTRACT)


with BuildPart() as body_2:
    # 草图57 → 凸台-拉伸34 (new body)
    with BuildSketch(Plane(origin=(0, 0, 0), x_dir=(1, 0, 0), z_dir=(0, 1, 0))):
        with Locations(Location((-1.85085497, -63.626481958, 0), (0, 0, 270))):
            Circle(SKETCH_57_R)
    extrude(amount=EXTRUDE_34_DEPTH)

    # 草图58 → 凸台-拉伸35 (add)
    with BuildSketch(Plane.XZ):
        with Locations(Location((-1.85085497, 63.626481958, 0), (0, 0, 90))):
            Circle(SKETCH_58_R)
    extrude(amount=EXTRUDE_35_DEPTH)

    # 草图59 → 切除-拉伸11 (cut)
    with BuildSketch(Plane.XZ.offset(51)):
        Polygon((1.324571511, 63.626481958), (-0.263141729, 66.376481958), (-3.43856821, 66.376481958), (-5.02628145, 63.626481958), (-3.43856821, 60.876481958), (-0.263141729, 60.876481958), align=None)
    extrude(amount=-CUT_EXTRUDE_11_DEPTH, mode=Mode.SUBTRACT)

    # 草图60 → 切除-拉伸12 (cut)
    with BuildSketch(Plane(origin=(0, 3, 0), x_dir=(1, 0, 0), z_dir=(0, 1, 0))):
        with Locations(Location((-1.85085497, -63.626481958, 0), (0, 0, 270))):
            Circle(SKETCH_60_R)
    extrude(amount=-CUT_EXTRUDE_12_DEPTH, mode=Mode.SUBTRACT)

    # 草图61 → 切除-拉伸13 (cut)
    with BuildSketch(Plane.XZ.offset(46)):
        with Locations(Location((-1.85085497, 63.626481958, 0), (0, 0, 270))):
            Circle(SKETCH_61_R)
    extrude(amount=-CUT_EXTRUDE_13_DEPTH, mode=Mode.SUBTRACT)

    # 草图62 → 切除-拉伸14 (cut)
    with BuildSketch(Plane.XZ):
        Polygon((10.516281134, 63.626481958), (9.332713082, 65.676481958), (6.965576978, 65.676481958), (5.782008927, 63.626481958), (6.965576978, 61.576481958), (9.332713082, 61.576481958), align=None)
    cut_extrude_14 = extrude(amount=-CUT_EXTRUDE_14_DEPTH, mode=Mode.SUBTRACT)

    # 草图63 → 切除-拉伸15 (cut)
    with BuildSketch(Plane.XZ.offset(-1.65)):
        with Locations(Location((8.14914503, 63.626481958, 0), (0, 0, 270))):
            Circle(SKETCH_63_R)
    cut_extrude_15 = extrude(amount=-CUT_EXTRUDE_15_DEPTH, mode=Mode.SUBTRACT)

    # 阵列(圆周)1: 切除-拉伸14, 切除-拉伸15 ×8 about axis
    pattern_circular_1_axis = Axis((-1.85085497, 0, 63.626481958), (0, 1, 0))
    add([cut_extrude_14.rotate(pattern_circular_1_axis, i * 360 / PATTERN_CIRCULAR_1_COUNT) for i in range(1, PATTERN_CIRCULAR_1_COUNT)], mode=Mode.SUBTRACT)
    add([cut_extrude_15.rotate(pattern_circular_1_axis, i * 360 / PATTERN_CIRCULAR_1_COUNT) for i in range(1, PATTERN_CIRCULAR_1_COUNT)], mode=Mode.SUBTRACT)

    # 草图66 → 凸台-拉伸36 (add)
    with BuildSketch(Plane.XZ.offset(51)):
        Polygon((1.324571511, 63.626481958), (-0.263141729, 66.376481958), (-3.43856821, 66.376481958), (-5.02628145, 63.626481958), (-3.43856821, 60.876481958), (-0.263141729, 60.876481958), align=None)
    extrude(amount=-EXTRUDE_36_DEPTH)

    # 草图67 → 切除-拉伸19 (cut)
    with BuildSketch(Plane.XZ.offset(51)):
        with Locations(Location((-1.85085497, 63.626481958, 0), (0, 0, 270))):
            Circle(SKETCH_67_R)
    extrude(amount=-CUT_EXTRUDE_19_DEPTH, mode=Mode.SUBTRACT)

    # 圆角3
    fillet_3_edges = [body_2.edges().sort_by_distance(p)[0] for p in [
        (-1.85085497, -43, 60.876481958),
    ]]
    fillet(fillet_3_edges, radius=FILLET_3_R)

    # 草图70 → 切除-拉伸21 (cut)
    with BuildSketch(Plane.XZ.offset(51)):
        Polygon((-2.716880374, 65.126481958), (-0.984829566, 65.126481958), (3.220078331, 65.126481958), (3.220078331, 62.126481958), (-0.984829566, 62.126481958), (-2.716880374, 62.126481958), (-7.47972899, 62.126481958), (-7.47972899, 65.126481958), align=None)
    extrude(amount=-CUT_EXTRUDE_21_DEPTH, mode=Mode.SUBTRACT)

    # 草图71 → 切除-拉伸22 (cut)
    with BuildSketch(Plane(origin=(0, 3, 0), x_dir=(1, 0, 0), z_dir=(0, 1, 0))):
        with Locations(Location((-1.85085497, -63.626481958, 0), (0, 0, 270))):
            Circle(SKETCH_71_R)
    extrude(amount=-CUT_EXTRUDE_22_DEPTH, mode=Mode.SUBTRACT)

    # 圆角4
    fillet_4_edges = [body_2.edges().sort_by_distance(p)[0] for p in [
        (-1.85085497, -43, 60.726481958),
    ]]
    fillet(fillet_4_edges, radius=FILLET_4_R)


with BuildPart() as cut_extrude_24_tool:
    # 草图73 → 切除-拉伸24 (new body)
    with BuildSketch(Plane(origin=(0, 0, 0), x_dir=(1, 0, 0), z_dir=(0, 1, 0))):
        with Locations((18.84464359, -42.930983399)):
            Circle(SKETCH_73_R)
    extrude(amount=-CUT_EXTRUDE_24_DEPTH)


with BuildPart() as part_1:
    add(part.part)

    # 切除-拉伸24: cut by cut_extrude_24_tool
    add(cut_extrude_24_tool.part, mode=Mode.SUBTRACT)


with BuildPart() as body_2_1:
    add(body_2.part)

    # 切除-拉伸24: cut by cut_extrude_24_tool
    add(cut_extrude_24_tool.part, mode=Mode.SUBTRACT)


with BuildPart() as cut_extrude_24_piece_1:
    # of the separate pieces the step leaves, piece 1, a body of its own (cut_extrude_24_pieces)
    add(part_1.part.solids().sort_by_distance((22.251010178, 3, 42.930983399))[0])


with BuildPart() as cut_extrude_24_piece_2:
    # of the separate pieces the step leaves, piece 2, a body of its own (cut_extrude_24_pieces)
    add(part_1.part.solids().sort_by_distance((21.09630964, -53, 42.930983399))[0])


with BuildPart() as cut_extrude_24_piece_1_of_body_2:
    # of the separate pieces the step leaves, piece 1, a body of its own (cut_extrude_24_pieces_of_body_2)
    add(body_2_1.part.solids().sort_by_distance((-1.85085497, 3, 66.526481958))[0])


with BuildPart() as cut_extrude_24_piece_2_of_body_2:
    # of the separate pieces the step leaves, piece 2, a body of its own (cut_extrude_24_pieces_of_body_2)
    add(body_2_1.part.solids().sort_by_distance((-1.85085497, -43, 65.526481958))[0])


with BuildPart() as cut_extrude_25_tool:
    # 草图74 → 切除-拉伸25 (new body)
    with BuildSketch(Plane(origin=(0, 0, 0), x_dir=(1, 0, 0), z_dir=(0, 1, 0))):
        with Locations((18.84464359, -42.930983399)):
            Circle(SKETCH_74_R)
    extrude(amount=CUT_EXTRUDE_25_DEPTH)


with BuildPart() as cut_extrude_24_piece_1_1:
    add(cut_extrude_24_piece_1.part)

    # 切除-拉伸25: cut by cut_extrude_25_tool
    add(cut_extrude_25_tool.part, mode=Mode.SUBTRACT)


with BuildPart() as cut_extrude_24_piece_1_of_body_2_1:
    add(cut_extrude_24_piece_1_of_body_2.part)

    # 切除-拉伸25: cut by cut_extrude_25_tool
    add(cut_extrude_25_tool.part, mode=Mode.SUBTRACT)


solid = Compound([cut_extrude_24_piece_2.part, cut_extrude_24_piece_2_of_body_2.part])
